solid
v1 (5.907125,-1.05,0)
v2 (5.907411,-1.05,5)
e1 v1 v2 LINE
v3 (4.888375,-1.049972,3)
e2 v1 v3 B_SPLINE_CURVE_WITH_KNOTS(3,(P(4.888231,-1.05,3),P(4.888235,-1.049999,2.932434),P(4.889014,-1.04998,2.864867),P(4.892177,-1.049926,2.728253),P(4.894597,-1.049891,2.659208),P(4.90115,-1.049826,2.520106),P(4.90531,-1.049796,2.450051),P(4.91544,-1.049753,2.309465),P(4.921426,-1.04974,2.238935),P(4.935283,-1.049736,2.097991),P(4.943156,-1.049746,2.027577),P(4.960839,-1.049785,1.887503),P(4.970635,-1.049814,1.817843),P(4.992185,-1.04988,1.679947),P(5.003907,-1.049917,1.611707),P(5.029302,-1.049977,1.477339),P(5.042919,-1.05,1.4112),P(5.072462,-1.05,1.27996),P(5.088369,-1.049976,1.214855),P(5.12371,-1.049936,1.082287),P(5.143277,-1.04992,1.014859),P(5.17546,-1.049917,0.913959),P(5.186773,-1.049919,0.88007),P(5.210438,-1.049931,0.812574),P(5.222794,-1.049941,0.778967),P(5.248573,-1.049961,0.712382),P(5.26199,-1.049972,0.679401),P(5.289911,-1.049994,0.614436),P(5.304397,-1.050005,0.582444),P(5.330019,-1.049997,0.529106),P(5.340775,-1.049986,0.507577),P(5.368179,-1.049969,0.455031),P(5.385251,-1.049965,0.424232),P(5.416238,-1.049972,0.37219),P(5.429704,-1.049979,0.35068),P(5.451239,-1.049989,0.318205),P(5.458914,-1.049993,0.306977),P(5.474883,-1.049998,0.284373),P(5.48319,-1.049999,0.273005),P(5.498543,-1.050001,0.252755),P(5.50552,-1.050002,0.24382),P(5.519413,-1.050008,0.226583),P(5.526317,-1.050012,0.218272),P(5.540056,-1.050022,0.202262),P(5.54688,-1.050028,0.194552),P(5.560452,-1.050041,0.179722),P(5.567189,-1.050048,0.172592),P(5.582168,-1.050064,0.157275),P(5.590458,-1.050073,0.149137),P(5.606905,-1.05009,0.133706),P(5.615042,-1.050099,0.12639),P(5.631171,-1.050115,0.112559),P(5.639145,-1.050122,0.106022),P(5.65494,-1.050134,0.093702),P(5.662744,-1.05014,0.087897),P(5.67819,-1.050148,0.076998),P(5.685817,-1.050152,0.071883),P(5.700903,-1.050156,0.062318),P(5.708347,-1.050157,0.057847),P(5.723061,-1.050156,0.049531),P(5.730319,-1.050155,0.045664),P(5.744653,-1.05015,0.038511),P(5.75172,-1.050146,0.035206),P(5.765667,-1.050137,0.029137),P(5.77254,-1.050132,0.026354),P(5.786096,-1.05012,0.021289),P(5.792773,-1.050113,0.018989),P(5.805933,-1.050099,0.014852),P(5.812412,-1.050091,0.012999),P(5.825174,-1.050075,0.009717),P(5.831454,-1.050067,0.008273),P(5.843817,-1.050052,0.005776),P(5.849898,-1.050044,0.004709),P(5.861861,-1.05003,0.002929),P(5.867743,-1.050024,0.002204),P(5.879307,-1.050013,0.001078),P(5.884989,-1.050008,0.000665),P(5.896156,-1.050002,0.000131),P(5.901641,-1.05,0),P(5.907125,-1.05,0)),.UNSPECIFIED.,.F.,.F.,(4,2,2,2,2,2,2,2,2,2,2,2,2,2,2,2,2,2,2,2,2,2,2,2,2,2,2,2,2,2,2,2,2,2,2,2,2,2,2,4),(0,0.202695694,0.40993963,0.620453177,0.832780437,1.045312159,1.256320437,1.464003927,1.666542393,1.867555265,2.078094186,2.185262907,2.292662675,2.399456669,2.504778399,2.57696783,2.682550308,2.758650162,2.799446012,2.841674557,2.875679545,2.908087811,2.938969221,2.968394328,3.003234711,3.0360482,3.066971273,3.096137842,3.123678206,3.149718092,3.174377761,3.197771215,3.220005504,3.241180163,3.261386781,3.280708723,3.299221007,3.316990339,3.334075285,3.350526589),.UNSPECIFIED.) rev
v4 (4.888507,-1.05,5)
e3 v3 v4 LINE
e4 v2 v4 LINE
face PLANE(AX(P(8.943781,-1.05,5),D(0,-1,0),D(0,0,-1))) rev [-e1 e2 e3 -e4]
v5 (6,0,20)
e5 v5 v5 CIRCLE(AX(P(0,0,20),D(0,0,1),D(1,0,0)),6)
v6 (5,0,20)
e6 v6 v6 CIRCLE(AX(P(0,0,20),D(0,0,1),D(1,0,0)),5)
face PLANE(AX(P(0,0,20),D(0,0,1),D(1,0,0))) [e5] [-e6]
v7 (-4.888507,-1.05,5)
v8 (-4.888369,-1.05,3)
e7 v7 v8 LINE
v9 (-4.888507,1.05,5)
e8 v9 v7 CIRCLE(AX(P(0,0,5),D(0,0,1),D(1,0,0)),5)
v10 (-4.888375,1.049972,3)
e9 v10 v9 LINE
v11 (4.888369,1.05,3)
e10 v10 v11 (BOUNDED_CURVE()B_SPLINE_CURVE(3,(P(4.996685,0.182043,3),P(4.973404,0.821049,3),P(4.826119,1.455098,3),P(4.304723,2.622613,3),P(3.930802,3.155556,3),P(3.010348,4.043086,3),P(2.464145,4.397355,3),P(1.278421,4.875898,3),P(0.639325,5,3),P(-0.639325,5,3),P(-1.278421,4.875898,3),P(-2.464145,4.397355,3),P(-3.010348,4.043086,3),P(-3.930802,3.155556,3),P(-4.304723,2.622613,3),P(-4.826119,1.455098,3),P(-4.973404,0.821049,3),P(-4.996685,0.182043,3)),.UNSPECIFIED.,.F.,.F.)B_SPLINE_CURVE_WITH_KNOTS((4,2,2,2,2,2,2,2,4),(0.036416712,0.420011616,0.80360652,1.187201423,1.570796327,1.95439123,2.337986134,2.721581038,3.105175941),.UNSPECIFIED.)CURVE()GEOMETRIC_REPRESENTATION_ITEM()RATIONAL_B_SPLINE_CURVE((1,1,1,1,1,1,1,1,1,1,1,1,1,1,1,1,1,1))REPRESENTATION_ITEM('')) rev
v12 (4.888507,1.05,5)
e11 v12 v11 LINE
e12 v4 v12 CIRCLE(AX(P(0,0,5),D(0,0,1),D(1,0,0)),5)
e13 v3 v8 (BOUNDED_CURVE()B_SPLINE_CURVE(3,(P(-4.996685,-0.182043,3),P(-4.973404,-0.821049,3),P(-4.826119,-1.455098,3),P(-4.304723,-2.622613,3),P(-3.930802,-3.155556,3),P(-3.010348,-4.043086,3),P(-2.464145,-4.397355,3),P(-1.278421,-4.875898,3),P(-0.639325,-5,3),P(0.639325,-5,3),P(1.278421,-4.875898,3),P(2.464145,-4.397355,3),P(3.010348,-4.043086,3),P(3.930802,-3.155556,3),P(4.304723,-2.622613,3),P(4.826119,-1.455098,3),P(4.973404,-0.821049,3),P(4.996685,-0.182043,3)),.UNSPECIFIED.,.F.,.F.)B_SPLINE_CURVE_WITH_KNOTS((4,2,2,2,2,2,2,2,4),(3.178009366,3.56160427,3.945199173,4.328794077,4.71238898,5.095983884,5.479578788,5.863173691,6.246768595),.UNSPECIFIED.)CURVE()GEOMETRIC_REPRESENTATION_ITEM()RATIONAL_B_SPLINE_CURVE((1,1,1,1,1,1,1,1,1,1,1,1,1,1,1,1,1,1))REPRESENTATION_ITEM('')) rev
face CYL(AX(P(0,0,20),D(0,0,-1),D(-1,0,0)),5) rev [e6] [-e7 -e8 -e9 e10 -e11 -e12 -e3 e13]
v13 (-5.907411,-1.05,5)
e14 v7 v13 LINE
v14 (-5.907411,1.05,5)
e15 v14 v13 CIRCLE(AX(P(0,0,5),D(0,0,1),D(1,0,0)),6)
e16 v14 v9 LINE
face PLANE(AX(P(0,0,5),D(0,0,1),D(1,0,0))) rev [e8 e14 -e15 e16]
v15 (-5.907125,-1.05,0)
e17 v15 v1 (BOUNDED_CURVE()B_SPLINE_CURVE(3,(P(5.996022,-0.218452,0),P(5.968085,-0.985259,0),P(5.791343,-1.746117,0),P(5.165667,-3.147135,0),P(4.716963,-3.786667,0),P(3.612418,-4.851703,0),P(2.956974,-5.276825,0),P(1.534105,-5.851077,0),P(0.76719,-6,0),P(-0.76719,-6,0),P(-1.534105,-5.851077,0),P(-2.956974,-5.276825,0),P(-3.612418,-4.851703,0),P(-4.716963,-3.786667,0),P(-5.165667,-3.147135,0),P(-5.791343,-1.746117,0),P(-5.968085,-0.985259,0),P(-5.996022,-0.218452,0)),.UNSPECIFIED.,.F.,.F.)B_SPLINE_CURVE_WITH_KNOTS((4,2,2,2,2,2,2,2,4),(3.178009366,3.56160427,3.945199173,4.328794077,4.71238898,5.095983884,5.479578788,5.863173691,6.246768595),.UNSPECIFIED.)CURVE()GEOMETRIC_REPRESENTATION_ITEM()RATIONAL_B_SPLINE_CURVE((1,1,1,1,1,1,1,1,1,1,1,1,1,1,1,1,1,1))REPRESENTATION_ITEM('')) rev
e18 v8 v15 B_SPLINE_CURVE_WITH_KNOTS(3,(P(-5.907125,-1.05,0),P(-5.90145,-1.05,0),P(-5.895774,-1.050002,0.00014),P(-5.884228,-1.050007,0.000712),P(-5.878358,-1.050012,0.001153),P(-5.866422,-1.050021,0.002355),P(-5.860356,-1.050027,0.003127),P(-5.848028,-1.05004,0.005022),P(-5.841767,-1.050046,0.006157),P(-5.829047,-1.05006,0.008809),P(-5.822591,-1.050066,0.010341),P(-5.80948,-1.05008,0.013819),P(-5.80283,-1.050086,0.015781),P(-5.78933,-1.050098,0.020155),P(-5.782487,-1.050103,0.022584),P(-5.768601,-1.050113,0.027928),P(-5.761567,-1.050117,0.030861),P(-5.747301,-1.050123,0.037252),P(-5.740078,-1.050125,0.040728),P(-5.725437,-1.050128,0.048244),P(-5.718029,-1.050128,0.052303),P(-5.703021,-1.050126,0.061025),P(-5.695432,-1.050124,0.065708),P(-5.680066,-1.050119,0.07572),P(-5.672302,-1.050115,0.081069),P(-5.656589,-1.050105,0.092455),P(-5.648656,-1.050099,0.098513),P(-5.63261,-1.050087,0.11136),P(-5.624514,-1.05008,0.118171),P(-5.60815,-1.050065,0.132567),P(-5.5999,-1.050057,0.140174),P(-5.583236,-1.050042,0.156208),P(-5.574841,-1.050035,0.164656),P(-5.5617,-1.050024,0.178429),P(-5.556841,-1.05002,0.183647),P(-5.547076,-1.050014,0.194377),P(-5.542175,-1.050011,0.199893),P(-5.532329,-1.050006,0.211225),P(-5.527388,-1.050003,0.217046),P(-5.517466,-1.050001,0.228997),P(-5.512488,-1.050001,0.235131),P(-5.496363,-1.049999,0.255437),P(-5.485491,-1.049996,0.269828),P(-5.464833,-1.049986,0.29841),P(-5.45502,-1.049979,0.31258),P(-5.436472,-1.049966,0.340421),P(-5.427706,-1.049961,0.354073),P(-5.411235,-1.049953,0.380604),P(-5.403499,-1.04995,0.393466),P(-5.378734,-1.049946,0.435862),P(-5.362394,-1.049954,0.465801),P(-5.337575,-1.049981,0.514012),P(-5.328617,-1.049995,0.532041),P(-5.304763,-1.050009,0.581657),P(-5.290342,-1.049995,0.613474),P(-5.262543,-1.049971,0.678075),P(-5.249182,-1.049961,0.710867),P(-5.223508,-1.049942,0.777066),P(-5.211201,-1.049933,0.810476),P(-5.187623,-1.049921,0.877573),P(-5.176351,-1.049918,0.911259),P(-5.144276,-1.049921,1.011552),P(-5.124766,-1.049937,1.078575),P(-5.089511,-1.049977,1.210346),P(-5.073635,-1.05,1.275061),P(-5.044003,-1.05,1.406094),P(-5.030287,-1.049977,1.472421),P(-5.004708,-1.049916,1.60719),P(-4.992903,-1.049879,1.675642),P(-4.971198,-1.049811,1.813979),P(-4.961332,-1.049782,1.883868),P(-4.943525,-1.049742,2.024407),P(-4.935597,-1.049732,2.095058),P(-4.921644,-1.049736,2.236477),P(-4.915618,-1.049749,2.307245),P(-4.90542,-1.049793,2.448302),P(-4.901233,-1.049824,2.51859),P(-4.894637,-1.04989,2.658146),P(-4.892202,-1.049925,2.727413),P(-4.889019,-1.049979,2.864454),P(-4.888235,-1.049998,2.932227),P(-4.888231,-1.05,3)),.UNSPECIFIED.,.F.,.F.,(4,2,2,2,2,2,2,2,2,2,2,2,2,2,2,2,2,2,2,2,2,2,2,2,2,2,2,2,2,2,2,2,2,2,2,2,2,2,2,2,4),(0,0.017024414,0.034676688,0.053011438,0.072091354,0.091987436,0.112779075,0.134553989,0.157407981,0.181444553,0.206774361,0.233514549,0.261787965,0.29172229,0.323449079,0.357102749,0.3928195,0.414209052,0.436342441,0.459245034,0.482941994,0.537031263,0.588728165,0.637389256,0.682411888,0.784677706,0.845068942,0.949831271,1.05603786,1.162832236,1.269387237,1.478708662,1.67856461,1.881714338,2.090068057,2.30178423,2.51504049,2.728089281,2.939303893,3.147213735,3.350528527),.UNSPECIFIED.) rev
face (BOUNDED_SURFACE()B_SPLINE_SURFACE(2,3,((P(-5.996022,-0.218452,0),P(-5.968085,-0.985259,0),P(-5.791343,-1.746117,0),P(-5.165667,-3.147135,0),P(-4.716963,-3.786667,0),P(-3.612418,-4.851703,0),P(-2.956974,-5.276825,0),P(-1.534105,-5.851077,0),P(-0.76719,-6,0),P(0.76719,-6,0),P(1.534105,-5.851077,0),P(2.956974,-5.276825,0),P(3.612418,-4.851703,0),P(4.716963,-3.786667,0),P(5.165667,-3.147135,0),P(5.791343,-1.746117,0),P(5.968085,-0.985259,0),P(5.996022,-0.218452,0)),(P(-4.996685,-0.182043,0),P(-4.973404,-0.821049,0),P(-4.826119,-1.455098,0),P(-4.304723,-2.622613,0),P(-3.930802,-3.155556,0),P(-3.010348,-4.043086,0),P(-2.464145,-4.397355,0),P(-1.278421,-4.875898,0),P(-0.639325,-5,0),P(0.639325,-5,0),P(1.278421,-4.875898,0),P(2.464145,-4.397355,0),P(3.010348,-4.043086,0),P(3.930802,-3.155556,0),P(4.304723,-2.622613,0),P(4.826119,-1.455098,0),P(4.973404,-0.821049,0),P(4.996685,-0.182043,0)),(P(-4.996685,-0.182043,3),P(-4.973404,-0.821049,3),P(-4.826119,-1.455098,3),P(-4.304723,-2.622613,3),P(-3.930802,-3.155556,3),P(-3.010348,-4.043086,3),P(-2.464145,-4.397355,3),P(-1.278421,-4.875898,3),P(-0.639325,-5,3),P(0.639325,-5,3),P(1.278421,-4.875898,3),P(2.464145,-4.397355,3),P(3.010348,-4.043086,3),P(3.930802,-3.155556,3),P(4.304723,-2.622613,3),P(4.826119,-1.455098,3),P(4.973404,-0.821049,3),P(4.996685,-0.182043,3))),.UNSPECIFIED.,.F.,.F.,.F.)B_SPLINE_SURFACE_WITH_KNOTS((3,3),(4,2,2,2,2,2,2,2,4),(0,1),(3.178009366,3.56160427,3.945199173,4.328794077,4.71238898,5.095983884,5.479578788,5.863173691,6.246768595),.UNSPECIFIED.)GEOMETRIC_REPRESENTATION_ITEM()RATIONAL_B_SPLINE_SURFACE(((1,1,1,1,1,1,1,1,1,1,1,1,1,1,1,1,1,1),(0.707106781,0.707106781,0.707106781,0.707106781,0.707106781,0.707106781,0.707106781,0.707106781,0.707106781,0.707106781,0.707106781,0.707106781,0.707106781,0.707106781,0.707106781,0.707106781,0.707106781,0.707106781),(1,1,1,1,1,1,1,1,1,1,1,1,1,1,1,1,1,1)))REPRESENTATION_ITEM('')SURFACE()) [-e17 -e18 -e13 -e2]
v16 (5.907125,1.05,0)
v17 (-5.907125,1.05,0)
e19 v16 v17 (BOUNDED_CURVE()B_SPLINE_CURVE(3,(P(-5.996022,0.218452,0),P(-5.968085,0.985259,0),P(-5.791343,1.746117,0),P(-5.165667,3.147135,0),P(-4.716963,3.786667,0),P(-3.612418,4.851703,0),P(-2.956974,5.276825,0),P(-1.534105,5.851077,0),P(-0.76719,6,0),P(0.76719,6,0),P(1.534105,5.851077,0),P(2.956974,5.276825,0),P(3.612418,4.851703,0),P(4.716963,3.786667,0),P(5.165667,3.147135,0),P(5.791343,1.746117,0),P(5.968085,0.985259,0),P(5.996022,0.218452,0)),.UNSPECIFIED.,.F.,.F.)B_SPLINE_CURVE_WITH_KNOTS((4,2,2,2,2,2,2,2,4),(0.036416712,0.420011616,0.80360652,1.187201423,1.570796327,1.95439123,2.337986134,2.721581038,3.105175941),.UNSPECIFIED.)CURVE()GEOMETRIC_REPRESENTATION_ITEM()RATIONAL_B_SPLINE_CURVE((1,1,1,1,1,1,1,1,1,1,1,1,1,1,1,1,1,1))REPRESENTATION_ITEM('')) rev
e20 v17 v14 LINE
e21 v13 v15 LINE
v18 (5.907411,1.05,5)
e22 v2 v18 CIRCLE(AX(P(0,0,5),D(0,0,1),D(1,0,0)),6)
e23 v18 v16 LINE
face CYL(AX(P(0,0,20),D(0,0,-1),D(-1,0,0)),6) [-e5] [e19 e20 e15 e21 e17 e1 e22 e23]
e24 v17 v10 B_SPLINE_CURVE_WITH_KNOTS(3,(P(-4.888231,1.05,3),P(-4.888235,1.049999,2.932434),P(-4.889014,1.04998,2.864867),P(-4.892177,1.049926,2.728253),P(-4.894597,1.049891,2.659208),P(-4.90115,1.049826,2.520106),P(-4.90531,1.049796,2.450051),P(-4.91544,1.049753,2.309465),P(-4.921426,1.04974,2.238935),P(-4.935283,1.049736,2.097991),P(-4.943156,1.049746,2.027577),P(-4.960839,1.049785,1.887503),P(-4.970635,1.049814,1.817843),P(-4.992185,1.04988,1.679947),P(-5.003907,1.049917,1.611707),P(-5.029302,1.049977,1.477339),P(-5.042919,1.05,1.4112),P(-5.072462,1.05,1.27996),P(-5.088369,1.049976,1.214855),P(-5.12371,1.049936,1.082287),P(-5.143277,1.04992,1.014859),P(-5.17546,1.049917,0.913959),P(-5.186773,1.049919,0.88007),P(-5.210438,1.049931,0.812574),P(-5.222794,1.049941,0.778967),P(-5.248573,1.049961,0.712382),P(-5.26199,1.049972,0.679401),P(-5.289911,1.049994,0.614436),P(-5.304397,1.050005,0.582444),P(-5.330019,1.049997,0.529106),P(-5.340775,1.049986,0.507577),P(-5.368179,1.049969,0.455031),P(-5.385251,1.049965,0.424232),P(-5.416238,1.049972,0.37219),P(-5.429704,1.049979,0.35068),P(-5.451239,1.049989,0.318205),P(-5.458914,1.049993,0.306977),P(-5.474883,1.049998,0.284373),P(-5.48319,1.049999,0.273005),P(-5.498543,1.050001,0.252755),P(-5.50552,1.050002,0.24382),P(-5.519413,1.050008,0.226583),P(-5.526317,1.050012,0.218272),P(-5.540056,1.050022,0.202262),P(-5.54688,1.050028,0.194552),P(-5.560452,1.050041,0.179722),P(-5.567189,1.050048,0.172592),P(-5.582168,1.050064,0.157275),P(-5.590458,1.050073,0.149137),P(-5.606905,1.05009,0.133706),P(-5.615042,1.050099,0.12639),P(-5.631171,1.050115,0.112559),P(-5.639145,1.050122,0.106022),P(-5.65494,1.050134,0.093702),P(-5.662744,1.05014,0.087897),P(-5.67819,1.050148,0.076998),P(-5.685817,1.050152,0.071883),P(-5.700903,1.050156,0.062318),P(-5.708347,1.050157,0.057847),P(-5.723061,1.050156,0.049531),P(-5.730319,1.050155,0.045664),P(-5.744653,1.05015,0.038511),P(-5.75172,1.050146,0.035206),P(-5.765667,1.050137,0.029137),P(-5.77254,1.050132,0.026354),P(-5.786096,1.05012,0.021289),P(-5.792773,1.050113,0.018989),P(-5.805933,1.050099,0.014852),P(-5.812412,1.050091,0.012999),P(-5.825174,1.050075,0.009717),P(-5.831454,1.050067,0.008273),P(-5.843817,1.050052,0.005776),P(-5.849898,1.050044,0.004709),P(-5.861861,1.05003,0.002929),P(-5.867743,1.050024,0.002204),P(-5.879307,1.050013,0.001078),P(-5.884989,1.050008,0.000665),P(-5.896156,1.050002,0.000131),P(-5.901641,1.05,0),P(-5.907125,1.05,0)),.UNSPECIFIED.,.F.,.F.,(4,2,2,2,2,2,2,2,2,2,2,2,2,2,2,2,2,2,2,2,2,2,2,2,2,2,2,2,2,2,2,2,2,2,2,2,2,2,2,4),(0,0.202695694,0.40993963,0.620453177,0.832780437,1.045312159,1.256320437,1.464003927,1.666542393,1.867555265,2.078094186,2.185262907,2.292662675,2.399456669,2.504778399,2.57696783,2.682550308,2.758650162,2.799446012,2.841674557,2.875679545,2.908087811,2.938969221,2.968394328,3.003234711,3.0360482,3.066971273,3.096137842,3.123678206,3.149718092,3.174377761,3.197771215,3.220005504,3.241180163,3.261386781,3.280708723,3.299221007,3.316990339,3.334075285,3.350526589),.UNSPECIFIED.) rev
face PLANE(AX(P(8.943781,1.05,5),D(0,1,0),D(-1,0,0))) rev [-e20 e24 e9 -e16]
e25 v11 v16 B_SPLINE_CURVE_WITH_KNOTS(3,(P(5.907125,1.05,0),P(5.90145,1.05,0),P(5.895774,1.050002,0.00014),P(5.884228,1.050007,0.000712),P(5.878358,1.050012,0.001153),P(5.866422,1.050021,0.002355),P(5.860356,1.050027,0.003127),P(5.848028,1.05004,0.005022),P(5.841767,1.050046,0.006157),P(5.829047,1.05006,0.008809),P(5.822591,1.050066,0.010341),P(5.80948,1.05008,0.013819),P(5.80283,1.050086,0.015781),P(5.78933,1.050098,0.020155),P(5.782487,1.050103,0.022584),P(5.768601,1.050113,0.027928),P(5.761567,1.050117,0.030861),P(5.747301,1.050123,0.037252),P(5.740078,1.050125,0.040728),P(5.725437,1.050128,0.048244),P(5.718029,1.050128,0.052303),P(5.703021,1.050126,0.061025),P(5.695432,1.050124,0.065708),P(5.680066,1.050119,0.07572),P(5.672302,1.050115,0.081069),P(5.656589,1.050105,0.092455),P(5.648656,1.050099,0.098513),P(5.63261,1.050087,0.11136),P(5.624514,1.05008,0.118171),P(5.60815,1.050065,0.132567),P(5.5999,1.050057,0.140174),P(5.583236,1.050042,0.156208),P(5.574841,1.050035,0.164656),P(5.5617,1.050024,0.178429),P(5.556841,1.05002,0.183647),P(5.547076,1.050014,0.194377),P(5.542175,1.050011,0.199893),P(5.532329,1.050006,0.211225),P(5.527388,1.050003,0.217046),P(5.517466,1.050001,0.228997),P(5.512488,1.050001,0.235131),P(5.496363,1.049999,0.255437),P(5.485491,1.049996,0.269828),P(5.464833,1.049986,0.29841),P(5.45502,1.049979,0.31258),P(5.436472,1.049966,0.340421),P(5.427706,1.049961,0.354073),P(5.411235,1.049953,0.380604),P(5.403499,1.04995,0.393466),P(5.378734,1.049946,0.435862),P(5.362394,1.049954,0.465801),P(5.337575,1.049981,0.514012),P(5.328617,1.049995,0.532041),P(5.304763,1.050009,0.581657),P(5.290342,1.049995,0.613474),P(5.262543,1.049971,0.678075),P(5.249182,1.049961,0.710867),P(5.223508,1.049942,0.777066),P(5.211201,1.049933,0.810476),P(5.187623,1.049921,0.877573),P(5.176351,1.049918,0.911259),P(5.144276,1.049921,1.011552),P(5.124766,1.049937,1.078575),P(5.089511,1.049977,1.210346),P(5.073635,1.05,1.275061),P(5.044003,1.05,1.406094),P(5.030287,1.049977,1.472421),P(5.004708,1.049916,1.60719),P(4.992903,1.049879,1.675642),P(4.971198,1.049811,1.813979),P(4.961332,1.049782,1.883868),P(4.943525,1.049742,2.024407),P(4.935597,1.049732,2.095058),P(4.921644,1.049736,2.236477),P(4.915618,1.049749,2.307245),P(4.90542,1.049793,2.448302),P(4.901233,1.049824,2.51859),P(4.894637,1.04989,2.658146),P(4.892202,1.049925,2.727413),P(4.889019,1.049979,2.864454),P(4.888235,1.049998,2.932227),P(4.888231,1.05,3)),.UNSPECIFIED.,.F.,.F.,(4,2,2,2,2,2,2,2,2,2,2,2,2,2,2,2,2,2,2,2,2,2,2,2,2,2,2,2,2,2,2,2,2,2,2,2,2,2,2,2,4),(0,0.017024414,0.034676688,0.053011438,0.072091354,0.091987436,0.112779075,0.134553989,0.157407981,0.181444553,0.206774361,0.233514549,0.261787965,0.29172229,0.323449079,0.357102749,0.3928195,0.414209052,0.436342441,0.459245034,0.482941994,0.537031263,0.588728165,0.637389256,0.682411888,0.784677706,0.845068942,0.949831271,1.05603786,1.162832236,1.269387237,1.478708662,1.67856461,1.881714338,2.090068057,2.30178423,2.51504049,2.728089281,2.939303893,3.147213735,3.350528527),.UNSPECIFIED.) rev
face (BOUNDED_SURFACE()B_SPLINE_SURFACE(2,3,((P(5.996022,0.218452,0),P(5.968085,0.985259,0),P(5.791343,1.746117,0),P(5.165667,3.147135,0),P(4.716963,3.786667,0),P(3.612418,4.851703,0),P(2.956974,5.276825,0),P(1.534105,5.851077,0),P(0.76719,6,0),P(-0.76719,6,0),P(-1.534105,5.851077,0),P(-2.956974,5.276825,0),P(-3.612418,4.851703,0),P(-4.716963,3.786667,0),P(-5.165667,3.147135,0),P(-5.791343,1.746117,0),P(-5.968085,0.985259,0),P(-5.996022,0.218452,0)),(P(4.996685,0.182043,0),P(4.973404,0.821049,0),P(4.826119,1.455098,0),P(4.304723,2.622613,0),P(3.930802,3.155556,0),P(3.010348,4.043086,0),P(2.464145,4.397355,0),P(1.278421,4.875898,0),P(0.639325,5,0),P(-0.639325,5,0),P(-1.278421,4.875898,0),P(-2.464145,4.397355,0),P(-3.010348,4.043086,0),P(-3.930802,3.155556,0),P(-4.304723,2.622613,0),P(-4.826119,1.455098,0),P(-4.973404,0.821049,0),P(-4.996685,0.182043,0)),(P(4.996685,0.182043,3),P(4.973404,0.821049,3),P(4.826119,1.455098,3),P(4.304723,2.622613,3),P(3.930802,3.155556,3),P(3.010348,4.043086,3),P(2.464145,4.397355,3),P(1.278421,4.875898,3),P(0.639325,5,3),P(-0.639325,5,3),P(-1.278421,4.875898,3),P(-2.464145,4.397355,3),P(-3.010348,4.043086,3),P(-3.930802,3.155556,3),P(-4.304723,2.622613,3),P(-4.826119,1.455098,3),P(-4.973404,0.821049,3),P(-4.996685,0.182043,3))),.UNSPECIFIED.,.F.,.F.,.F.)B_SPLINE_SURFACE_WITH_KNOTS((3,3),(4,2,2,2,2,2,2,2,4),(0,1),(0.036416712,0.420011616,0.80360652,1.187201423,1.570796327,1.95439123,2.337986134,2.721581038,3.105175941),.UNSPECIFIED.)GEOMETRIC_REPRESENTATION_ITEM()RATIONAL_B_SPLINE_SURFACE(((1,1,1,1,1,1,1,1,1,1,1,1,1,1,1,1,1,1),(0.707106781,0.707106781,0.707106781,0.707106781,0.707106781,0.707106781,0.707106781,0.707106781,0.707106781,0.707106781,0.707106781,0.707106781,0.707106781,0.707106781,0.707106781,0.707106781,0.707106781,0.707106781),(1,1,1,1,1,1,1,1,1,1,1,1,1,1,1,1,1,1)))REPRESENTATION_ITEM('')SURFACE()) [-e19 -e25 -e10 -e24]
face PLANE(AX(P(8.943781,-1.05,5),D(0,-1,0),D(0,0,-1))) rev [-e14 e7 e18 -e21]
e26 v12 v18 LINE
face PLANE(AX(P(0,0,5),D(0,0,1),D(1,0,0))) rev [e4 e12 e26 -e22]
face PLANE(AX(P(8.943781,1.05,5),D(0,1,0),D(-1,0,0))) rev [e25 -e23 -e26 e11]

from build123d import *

# Parameters (mm, degrees)
SKETCH1_R           = 6
SKETCH1_R_2         = 5
BOSS_EXTRUDE1_DEPTH = 20
SKETCH2_W           = 17.887562732
SKETCH2_H           = 2.1
CUT_EXTRUDE1_DEPTH  = 5
FILLET2_SIZE        = 1
FILLET2_SIZE_2      = 3


with BuildPart() as part:
    # Sketch1 → Boss-Extrude1 (new body)
    with BuildSketch(Plane.XY):
        Circle(SKETCH1_R)
        Circle(SKETCH1_R_2, mode=Mode.SUBTRACT)
    extrude(amount=BOSS_EXTRUDE1_DEPTH)

    # Sketch2 → Cut-Extrude1 (cut)
    with BuildSketch(Plane(origin=(0, 0, 0), x_dir=(-1, 0, 0), z_dir=(0, 0, -1))):
        Rectangle(SKETCH2_W, SKETCH2_H)
    extrude(amount=-CUT_EXTRUDE1_DEPTH, mode=Mode.SUBTRACT)

    # Fillet2
    # a fillet whose section is not a circle: 3, 1 mm, written as the material it takes off along each edge
    with BuildSketch(Plane(origin=(0, 0, 0), x_dir=(-0.2768991619260433, 0.9608989822685082, 0), z_dir=(0.9608989822685082, 0.2768991619260433, 0))) as fillet2_piece_1:
        with BuildLine():
            Bezier((5 + FILLET2_SIZE, 0), (5, 0), (5, FILLET2_SIZE_2), weights=[1, 0.707106781, 1])
            Line((5, FILLET2_SIZE_2), (5, 0))
            Line((5, 0), (5 + FILLET2_SIZE, 0))
        make_face()
    revolve(axis=Axis((0, 0, 0), (0, 0, 1)), revolution_arc=327.849552319, mode=Mode.SUBTRACT)
    with BuildSketch(Plane(origin=(0, 0, 0), x_dir=(0.2768991619260793, -0.9608989822684979, 0), z_dir=(-0.9608989822684979, -0.2768991619260793, 0))) as fillet2_piece_2:
        with BuildLine():
            Bezier((5 + FILLET2_SIZE, 0), (5, 0), (5, FILLET2_SIZE_2), weights=[1, 0.707106781, 1])
            Line((5, FILLET2_SIZE_2), (5, 0))
            Line((5, 0), (5 + FILLET2_SIZE, 0))
        make_face()
    revolve(axis=Axis((0, 0, 0), (0, 0, 1)), revolution_arc=327.849552319, mode=Mode.SUBTRACT)


solid = part.part
